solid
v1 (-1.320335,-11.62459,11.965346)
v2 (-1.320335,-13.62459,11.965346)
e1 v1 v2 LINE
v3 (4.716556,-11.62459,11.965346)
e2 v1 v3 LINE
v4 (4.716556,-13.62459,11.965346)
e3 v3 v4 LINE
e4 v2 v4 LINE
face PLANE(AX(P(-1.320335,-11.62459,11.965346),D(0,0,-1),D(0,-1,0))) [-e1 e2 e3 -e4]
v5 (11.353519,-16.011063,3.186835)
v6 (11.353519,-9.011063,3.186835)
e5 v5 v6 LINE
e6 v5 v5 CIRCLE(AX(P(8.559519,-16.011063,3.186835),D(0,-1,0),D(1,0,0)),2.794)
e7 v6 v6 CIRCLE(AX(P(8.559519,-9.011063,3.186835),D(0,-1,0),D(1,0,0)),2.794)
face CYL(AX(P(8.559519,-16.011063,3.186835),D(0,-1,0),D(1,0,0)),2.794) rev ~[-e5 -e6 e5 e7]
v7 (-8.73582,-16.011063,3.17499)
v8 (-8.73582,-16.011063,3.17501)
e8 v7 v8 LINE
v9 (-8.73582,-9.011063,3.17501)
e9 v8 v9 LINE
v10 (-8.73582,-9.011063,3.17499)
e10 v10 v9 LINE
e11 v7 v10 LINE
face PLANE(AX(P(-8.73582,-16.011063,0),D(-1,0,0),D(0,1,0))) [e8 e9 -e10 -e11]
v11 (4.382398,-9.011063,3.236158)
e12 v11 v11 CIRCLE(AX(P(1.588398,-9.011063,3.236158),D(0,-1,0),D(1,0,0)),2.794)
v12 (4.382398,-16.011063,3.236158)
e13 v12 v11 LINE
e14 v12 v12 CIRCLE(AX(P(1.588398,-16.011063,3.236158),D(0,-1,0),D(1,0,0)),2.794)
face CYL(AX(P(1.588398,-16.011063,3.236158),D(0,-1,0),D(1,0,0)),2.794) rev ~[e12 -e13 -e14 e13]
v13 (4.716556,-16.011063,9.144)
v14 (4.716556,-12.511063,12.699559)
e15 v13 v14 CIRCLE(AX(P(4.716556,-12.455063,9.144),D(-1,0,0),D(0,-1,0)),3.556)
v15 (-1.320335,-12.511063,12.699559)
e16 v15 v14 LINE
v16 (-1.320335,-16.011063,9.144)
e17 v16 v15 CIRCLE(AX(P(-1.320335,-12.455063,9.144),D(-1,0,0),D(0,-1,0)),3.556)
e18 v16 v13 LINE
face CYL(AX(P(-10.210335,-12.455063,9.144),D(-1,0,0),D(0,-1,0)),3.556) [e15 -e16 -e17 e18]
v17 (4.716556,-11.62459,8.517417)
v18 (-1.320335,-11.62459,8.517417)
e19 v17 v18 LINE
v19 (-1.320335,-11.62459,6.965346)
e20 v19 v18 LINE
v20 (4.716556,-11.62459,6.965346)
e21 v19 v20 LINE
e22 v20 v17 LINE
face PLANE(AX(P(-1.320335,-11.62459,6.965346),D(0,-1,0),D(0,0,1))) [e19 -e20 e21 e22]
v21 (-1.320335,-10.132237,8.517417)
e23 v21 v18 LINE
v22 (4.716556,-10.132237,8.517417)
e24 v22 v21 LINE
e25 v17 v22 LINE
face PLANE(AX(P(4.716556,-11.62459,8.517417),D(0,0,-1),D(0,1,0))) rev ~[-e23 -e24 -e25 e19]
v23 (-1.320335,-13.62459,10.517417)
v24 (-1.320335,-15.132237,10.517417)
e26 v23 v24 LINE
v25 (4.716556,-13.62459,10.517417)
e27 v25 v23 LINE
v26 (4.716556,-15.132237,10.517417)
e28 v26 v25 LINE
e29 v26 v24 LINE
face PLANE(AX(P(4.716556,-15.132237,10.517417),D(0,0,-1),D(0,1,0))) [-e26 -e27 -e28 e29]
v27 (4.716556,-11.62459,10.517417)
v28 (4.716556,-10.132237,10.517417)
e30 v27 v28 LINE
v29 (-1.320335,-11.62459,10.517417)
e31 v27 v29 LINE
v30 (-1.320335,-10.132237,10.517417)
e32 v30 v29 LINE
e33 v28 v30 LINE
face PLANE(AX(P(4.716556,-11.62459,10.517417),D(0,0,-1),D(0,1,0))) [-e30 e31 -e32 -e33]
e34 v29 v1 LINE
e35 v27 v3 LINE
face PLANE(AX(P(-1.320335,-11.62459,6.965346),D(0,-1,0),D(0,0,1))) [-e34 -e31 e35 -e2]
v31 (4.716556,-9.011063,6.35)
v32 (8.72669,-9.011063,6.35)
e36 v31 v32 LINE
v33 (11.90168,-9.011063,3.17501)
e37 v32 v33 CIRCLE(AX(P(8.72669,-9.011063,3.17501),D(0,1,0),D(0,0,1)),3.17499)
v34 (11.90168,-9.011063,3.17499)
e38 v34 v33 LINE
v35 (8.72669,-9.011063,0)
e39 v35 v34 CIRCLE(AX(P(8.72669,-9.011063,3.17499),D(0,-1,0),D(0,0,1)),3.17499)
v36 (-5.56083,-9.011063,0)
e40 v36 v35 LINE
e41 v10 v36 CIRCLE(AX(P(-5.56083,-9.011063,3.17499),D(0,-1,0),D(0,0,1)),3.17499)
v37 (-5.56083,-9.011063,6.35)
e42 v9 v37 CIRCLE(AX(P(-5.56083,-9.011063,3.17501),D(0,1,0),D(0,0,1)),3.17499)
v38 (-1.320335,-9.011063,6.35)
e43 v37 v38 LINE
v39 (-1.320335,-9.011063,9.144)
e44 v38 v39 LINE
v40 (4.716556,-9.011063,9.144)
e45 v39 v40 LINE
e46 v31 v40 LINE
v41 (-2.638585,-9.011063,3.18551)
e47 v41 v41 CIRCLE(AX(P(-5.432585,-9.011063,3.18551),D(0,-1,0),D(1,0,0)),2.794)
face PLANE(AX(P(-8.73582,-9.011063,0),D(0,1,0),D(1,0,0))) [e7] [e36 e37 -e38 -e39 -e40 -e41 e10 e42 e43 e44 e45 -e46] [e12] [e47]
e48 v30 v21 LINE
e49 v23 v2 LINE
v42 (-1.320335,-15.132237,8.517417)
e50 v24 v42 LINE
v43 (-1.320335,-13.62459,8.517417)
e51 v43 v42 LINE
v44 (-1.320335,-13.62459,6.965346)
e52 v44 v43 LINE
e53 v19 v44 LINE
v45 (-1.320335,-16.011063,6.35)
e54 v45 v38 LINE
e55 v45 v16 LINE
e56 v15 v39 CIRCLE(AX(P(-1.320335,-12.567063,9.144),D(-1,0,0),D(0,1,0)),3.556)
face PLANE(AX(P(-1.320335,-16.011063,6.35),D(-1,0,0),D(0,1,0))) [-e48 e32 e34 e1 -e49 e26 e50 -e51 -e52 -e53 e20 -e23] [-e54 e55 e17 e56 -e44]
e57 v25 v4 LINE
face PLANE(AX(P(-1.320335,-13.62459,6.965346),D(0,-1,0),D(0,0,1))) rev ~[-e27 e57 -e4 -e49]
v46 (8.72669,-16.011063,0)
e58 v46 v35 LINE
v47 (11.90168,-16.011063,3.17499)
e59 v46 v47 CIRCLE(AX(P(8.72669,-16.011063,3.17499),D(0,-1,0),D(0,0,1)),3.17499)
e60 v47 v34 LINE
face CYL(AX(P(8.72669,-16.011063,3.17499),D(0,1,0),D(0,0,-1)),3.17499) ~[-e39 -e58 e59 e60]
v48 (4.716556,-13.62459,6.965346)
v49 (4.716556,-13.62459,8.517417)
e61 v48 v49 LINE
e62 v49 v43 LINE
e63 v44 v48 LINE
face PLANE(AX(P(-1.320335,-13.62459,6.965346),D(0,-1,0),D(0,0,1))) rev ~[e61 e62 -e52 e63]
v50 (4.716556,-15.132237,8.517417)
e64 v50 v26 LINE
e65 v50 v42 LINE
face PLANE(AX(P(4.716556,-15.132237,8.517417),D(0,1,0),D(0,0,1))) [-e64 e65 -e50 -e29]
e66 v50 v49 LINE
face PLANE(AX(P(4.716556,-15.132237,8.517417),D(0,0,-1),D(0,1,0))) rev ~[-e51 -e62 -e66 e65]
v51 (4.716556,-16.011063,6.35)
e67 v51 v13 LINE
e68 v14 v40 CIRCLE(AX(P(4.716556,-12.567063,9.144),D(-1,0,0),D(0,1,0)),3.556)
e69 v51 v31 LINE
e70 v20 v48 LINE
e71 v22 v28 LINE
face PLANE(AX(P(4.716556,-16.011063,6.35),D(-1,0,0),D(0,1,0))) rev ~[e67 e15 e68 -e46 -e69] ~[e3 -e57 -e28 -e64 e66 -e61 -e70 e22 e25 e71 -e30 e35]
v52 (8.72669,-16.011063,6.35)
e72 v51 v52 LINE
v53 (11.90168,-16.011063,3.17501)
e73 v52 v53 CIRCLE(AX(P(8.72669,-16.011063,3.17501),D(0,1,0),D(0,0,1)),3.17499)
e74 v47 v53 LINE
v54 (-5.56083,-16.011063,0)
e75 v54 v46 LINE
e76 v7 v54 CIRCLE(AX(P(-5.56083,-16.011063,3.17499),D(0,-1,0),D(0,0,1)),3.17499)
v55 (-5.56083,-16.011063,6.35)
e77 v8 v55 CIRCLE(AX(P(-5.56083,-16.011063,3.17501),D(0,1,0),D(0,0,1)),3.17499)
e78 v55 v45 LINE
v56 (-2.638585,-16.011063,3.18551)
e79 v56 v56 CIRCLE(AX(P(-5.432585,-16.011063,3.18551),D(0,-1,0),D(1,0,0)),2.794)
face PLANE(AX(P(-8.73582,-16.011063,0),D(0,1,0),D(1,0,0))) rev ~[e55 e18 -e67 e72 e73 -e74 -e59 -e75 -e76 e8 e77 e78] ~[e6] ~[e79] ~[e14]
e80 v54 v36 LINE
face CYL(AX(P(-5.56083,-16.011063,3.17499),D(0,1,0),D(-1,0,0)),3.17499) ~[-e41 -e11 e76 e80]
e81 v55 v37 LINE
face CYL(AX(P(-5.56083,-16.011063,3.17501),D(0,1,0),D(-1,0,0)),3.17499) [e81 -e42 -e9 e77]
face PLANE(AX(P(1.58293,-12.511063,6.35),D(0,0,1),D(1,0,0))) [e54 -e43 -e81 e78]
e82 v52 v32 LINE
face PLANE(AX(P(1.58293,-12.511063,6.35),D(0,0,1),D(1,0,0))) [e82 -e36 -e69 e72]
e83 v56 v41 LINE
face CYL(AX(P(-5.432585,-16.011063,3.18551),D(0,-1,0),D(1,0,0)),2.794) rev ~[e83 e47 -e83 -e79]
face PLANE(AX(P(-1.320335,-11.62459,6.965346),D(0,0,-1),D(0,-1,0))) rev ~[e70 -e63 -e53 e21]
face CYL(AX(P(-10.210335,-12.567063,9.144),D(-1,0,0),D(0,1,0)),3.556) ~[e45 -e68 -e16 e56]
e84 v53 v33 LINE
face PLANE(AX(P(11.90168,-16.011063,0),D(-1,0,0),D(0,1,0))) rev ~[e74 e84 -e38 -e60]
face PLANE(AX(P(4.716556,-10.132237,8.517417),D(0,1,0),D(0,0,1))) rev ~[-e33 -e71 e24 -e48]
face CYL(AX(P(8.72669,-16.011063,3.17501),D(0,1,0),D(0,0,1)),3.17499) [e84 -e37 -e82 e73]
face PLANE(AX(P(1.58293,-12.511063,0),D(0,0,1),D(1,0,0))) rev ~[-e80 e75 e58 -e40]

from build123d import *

# Parameters (mm, degrees)
F0_W        = 20.6375
F0_H        = 7
F1_DEPTH    = 6.35
F2_R        = 2.794
F3_DEPTH    = 8
F4_R        = 3.17499
F5_W        = 6.0368906707
F5_H        = 7
F6_DEPTH    = 6.35
F7_T1_DEPTH = 23.8168906707
F8_W        = 2
F8_H        = 5
F9_DEPTH    = 6.35
F10_W       = 1.5076477192
F10_H       = 2
F10_W_2     = 1.4923522808
F10_W_3     = 2
F10_H_2     = 1.5520717202
F11_DEPTH   = 6.35


# Not quite as in the source:
# - a fillet or chamfer that OpenCascade refuses, or shapes differently, is made with other operations: its cross-section is extruded or revolved along the edge and cut away or added
# - a fillet or chamfer is up to 0.001 mm smaller than in the source, because OpenCascade refuses the exact size


with BuildPart() as f1:
    # F0 (on Top) → F1 (new body)
    with BuildSketch(Plane.XY):
        with Locations((1.5829298645, -12.5110630834)):
            Rectangle(F0_W, F0_H)
    extrude(amount=F1_DEPTH)

    # F2 (on face) → F3 (cut)
    with BuildSketch(Plane.XZ.offset(16.0110630834)):
        with Locations((-5.4325845507, 3.1855095279)):
            Circle(F2_R)
        with Locations((1.5883980845, 3.2361580911)):
            Circle(F2_R)
        with Locations((8.5595190756, 3.1868351264)):
            Circle(F2_R)
    extrude(amount=-F3_DEPTH, mode=Mode.SUBTRACT)

    # F4 (radius 3.175 in the source; OpenCascade refuses exactly that, so slightly less here)
    f4_edges = [f1.edges().sort_by_distance(p)[0] for p in [
        (11.90168, -12.511063, 6.35),
        (11.90168, -12.511063, 0),
        (-8.73582, -12.511063, 6.35),
        (-8.73582, -12.511063, 0),
    ]]
    fillet(f4_edges, radius=F4_R)

    # F5 (on face) → F6 (join)
    with BuildSketch(Plane.XY.offset(6.35)):
        with Locations((1.6981104854, -12.5110630834)):
            Rectangle(F5_W, F5_H)
    extrude(amount=F6_DEPTH)

    # F7: fillet of radius 3.556 on 2 edges, made by hand

    # F7_s2 → F7_t1 (cut)
    with BuildSketch(Plane.YZ.offset(-10.2103348499)):
        with BuildLine():
            ThreePointArc((-16.0110630834, 9.144), (-14.9695347973, 11.6584717139), (-12.4550630834, 12.7))
            Line((-12.4550630834, 12.7), (-16.0110630834, 12.7))
            Line((-16.0110630834, 12.7), (-16.0110630834, 9.144))
        make_face()
        with BuildLine():
            ThreePointArc((-9.0110630834, 9.144), (-10.0525913695, 11.6584717139), (-12.5670630834, 12.7))
            Line((-12.5670630834, 12.7), (-9.0110630834, 12.7))
            Line((-9.0110630834, 12.7), (-9.0110630834, 9.144))
        make_face()
    extrude(amount=F7_T1_DEPTH, mode=Mode.SUBTRACT)

    # F8 (on face) → F9 (cut)
    with BuildSketch(Plane(origin=(-1.3203348499, 0, 0), x_dir=(0, -1, 0), z_dir=(-1, 0, 0))):
        with Locations((12.6245897673, 9.4653457722)):
            Rectangle(F8_W, F8_H)
    extrude(amount=-F9_DEPTH, mode=Mode.SUBTRACT)

    # F10 (on face) → F11 (cut)
    with BuildSketch(Plane.YZ.offset(4.7165558208)):
        with Locations((-14.3784136269, 9.5174174924)):
            Rectangle(F10_W, F10_H)
        with Locations((-10.8784136269, 9.5174174924)):
            Rectangle(F10_W_2, F10_H)
        with Locations((-12.6245897673, 7.7413816323)):
            Rectangle(F10_W_3, F10_H_2)
    extrude(amount=-F11_DEPTH, mode=Mode.SUBTRACT)


solid = f1.part
